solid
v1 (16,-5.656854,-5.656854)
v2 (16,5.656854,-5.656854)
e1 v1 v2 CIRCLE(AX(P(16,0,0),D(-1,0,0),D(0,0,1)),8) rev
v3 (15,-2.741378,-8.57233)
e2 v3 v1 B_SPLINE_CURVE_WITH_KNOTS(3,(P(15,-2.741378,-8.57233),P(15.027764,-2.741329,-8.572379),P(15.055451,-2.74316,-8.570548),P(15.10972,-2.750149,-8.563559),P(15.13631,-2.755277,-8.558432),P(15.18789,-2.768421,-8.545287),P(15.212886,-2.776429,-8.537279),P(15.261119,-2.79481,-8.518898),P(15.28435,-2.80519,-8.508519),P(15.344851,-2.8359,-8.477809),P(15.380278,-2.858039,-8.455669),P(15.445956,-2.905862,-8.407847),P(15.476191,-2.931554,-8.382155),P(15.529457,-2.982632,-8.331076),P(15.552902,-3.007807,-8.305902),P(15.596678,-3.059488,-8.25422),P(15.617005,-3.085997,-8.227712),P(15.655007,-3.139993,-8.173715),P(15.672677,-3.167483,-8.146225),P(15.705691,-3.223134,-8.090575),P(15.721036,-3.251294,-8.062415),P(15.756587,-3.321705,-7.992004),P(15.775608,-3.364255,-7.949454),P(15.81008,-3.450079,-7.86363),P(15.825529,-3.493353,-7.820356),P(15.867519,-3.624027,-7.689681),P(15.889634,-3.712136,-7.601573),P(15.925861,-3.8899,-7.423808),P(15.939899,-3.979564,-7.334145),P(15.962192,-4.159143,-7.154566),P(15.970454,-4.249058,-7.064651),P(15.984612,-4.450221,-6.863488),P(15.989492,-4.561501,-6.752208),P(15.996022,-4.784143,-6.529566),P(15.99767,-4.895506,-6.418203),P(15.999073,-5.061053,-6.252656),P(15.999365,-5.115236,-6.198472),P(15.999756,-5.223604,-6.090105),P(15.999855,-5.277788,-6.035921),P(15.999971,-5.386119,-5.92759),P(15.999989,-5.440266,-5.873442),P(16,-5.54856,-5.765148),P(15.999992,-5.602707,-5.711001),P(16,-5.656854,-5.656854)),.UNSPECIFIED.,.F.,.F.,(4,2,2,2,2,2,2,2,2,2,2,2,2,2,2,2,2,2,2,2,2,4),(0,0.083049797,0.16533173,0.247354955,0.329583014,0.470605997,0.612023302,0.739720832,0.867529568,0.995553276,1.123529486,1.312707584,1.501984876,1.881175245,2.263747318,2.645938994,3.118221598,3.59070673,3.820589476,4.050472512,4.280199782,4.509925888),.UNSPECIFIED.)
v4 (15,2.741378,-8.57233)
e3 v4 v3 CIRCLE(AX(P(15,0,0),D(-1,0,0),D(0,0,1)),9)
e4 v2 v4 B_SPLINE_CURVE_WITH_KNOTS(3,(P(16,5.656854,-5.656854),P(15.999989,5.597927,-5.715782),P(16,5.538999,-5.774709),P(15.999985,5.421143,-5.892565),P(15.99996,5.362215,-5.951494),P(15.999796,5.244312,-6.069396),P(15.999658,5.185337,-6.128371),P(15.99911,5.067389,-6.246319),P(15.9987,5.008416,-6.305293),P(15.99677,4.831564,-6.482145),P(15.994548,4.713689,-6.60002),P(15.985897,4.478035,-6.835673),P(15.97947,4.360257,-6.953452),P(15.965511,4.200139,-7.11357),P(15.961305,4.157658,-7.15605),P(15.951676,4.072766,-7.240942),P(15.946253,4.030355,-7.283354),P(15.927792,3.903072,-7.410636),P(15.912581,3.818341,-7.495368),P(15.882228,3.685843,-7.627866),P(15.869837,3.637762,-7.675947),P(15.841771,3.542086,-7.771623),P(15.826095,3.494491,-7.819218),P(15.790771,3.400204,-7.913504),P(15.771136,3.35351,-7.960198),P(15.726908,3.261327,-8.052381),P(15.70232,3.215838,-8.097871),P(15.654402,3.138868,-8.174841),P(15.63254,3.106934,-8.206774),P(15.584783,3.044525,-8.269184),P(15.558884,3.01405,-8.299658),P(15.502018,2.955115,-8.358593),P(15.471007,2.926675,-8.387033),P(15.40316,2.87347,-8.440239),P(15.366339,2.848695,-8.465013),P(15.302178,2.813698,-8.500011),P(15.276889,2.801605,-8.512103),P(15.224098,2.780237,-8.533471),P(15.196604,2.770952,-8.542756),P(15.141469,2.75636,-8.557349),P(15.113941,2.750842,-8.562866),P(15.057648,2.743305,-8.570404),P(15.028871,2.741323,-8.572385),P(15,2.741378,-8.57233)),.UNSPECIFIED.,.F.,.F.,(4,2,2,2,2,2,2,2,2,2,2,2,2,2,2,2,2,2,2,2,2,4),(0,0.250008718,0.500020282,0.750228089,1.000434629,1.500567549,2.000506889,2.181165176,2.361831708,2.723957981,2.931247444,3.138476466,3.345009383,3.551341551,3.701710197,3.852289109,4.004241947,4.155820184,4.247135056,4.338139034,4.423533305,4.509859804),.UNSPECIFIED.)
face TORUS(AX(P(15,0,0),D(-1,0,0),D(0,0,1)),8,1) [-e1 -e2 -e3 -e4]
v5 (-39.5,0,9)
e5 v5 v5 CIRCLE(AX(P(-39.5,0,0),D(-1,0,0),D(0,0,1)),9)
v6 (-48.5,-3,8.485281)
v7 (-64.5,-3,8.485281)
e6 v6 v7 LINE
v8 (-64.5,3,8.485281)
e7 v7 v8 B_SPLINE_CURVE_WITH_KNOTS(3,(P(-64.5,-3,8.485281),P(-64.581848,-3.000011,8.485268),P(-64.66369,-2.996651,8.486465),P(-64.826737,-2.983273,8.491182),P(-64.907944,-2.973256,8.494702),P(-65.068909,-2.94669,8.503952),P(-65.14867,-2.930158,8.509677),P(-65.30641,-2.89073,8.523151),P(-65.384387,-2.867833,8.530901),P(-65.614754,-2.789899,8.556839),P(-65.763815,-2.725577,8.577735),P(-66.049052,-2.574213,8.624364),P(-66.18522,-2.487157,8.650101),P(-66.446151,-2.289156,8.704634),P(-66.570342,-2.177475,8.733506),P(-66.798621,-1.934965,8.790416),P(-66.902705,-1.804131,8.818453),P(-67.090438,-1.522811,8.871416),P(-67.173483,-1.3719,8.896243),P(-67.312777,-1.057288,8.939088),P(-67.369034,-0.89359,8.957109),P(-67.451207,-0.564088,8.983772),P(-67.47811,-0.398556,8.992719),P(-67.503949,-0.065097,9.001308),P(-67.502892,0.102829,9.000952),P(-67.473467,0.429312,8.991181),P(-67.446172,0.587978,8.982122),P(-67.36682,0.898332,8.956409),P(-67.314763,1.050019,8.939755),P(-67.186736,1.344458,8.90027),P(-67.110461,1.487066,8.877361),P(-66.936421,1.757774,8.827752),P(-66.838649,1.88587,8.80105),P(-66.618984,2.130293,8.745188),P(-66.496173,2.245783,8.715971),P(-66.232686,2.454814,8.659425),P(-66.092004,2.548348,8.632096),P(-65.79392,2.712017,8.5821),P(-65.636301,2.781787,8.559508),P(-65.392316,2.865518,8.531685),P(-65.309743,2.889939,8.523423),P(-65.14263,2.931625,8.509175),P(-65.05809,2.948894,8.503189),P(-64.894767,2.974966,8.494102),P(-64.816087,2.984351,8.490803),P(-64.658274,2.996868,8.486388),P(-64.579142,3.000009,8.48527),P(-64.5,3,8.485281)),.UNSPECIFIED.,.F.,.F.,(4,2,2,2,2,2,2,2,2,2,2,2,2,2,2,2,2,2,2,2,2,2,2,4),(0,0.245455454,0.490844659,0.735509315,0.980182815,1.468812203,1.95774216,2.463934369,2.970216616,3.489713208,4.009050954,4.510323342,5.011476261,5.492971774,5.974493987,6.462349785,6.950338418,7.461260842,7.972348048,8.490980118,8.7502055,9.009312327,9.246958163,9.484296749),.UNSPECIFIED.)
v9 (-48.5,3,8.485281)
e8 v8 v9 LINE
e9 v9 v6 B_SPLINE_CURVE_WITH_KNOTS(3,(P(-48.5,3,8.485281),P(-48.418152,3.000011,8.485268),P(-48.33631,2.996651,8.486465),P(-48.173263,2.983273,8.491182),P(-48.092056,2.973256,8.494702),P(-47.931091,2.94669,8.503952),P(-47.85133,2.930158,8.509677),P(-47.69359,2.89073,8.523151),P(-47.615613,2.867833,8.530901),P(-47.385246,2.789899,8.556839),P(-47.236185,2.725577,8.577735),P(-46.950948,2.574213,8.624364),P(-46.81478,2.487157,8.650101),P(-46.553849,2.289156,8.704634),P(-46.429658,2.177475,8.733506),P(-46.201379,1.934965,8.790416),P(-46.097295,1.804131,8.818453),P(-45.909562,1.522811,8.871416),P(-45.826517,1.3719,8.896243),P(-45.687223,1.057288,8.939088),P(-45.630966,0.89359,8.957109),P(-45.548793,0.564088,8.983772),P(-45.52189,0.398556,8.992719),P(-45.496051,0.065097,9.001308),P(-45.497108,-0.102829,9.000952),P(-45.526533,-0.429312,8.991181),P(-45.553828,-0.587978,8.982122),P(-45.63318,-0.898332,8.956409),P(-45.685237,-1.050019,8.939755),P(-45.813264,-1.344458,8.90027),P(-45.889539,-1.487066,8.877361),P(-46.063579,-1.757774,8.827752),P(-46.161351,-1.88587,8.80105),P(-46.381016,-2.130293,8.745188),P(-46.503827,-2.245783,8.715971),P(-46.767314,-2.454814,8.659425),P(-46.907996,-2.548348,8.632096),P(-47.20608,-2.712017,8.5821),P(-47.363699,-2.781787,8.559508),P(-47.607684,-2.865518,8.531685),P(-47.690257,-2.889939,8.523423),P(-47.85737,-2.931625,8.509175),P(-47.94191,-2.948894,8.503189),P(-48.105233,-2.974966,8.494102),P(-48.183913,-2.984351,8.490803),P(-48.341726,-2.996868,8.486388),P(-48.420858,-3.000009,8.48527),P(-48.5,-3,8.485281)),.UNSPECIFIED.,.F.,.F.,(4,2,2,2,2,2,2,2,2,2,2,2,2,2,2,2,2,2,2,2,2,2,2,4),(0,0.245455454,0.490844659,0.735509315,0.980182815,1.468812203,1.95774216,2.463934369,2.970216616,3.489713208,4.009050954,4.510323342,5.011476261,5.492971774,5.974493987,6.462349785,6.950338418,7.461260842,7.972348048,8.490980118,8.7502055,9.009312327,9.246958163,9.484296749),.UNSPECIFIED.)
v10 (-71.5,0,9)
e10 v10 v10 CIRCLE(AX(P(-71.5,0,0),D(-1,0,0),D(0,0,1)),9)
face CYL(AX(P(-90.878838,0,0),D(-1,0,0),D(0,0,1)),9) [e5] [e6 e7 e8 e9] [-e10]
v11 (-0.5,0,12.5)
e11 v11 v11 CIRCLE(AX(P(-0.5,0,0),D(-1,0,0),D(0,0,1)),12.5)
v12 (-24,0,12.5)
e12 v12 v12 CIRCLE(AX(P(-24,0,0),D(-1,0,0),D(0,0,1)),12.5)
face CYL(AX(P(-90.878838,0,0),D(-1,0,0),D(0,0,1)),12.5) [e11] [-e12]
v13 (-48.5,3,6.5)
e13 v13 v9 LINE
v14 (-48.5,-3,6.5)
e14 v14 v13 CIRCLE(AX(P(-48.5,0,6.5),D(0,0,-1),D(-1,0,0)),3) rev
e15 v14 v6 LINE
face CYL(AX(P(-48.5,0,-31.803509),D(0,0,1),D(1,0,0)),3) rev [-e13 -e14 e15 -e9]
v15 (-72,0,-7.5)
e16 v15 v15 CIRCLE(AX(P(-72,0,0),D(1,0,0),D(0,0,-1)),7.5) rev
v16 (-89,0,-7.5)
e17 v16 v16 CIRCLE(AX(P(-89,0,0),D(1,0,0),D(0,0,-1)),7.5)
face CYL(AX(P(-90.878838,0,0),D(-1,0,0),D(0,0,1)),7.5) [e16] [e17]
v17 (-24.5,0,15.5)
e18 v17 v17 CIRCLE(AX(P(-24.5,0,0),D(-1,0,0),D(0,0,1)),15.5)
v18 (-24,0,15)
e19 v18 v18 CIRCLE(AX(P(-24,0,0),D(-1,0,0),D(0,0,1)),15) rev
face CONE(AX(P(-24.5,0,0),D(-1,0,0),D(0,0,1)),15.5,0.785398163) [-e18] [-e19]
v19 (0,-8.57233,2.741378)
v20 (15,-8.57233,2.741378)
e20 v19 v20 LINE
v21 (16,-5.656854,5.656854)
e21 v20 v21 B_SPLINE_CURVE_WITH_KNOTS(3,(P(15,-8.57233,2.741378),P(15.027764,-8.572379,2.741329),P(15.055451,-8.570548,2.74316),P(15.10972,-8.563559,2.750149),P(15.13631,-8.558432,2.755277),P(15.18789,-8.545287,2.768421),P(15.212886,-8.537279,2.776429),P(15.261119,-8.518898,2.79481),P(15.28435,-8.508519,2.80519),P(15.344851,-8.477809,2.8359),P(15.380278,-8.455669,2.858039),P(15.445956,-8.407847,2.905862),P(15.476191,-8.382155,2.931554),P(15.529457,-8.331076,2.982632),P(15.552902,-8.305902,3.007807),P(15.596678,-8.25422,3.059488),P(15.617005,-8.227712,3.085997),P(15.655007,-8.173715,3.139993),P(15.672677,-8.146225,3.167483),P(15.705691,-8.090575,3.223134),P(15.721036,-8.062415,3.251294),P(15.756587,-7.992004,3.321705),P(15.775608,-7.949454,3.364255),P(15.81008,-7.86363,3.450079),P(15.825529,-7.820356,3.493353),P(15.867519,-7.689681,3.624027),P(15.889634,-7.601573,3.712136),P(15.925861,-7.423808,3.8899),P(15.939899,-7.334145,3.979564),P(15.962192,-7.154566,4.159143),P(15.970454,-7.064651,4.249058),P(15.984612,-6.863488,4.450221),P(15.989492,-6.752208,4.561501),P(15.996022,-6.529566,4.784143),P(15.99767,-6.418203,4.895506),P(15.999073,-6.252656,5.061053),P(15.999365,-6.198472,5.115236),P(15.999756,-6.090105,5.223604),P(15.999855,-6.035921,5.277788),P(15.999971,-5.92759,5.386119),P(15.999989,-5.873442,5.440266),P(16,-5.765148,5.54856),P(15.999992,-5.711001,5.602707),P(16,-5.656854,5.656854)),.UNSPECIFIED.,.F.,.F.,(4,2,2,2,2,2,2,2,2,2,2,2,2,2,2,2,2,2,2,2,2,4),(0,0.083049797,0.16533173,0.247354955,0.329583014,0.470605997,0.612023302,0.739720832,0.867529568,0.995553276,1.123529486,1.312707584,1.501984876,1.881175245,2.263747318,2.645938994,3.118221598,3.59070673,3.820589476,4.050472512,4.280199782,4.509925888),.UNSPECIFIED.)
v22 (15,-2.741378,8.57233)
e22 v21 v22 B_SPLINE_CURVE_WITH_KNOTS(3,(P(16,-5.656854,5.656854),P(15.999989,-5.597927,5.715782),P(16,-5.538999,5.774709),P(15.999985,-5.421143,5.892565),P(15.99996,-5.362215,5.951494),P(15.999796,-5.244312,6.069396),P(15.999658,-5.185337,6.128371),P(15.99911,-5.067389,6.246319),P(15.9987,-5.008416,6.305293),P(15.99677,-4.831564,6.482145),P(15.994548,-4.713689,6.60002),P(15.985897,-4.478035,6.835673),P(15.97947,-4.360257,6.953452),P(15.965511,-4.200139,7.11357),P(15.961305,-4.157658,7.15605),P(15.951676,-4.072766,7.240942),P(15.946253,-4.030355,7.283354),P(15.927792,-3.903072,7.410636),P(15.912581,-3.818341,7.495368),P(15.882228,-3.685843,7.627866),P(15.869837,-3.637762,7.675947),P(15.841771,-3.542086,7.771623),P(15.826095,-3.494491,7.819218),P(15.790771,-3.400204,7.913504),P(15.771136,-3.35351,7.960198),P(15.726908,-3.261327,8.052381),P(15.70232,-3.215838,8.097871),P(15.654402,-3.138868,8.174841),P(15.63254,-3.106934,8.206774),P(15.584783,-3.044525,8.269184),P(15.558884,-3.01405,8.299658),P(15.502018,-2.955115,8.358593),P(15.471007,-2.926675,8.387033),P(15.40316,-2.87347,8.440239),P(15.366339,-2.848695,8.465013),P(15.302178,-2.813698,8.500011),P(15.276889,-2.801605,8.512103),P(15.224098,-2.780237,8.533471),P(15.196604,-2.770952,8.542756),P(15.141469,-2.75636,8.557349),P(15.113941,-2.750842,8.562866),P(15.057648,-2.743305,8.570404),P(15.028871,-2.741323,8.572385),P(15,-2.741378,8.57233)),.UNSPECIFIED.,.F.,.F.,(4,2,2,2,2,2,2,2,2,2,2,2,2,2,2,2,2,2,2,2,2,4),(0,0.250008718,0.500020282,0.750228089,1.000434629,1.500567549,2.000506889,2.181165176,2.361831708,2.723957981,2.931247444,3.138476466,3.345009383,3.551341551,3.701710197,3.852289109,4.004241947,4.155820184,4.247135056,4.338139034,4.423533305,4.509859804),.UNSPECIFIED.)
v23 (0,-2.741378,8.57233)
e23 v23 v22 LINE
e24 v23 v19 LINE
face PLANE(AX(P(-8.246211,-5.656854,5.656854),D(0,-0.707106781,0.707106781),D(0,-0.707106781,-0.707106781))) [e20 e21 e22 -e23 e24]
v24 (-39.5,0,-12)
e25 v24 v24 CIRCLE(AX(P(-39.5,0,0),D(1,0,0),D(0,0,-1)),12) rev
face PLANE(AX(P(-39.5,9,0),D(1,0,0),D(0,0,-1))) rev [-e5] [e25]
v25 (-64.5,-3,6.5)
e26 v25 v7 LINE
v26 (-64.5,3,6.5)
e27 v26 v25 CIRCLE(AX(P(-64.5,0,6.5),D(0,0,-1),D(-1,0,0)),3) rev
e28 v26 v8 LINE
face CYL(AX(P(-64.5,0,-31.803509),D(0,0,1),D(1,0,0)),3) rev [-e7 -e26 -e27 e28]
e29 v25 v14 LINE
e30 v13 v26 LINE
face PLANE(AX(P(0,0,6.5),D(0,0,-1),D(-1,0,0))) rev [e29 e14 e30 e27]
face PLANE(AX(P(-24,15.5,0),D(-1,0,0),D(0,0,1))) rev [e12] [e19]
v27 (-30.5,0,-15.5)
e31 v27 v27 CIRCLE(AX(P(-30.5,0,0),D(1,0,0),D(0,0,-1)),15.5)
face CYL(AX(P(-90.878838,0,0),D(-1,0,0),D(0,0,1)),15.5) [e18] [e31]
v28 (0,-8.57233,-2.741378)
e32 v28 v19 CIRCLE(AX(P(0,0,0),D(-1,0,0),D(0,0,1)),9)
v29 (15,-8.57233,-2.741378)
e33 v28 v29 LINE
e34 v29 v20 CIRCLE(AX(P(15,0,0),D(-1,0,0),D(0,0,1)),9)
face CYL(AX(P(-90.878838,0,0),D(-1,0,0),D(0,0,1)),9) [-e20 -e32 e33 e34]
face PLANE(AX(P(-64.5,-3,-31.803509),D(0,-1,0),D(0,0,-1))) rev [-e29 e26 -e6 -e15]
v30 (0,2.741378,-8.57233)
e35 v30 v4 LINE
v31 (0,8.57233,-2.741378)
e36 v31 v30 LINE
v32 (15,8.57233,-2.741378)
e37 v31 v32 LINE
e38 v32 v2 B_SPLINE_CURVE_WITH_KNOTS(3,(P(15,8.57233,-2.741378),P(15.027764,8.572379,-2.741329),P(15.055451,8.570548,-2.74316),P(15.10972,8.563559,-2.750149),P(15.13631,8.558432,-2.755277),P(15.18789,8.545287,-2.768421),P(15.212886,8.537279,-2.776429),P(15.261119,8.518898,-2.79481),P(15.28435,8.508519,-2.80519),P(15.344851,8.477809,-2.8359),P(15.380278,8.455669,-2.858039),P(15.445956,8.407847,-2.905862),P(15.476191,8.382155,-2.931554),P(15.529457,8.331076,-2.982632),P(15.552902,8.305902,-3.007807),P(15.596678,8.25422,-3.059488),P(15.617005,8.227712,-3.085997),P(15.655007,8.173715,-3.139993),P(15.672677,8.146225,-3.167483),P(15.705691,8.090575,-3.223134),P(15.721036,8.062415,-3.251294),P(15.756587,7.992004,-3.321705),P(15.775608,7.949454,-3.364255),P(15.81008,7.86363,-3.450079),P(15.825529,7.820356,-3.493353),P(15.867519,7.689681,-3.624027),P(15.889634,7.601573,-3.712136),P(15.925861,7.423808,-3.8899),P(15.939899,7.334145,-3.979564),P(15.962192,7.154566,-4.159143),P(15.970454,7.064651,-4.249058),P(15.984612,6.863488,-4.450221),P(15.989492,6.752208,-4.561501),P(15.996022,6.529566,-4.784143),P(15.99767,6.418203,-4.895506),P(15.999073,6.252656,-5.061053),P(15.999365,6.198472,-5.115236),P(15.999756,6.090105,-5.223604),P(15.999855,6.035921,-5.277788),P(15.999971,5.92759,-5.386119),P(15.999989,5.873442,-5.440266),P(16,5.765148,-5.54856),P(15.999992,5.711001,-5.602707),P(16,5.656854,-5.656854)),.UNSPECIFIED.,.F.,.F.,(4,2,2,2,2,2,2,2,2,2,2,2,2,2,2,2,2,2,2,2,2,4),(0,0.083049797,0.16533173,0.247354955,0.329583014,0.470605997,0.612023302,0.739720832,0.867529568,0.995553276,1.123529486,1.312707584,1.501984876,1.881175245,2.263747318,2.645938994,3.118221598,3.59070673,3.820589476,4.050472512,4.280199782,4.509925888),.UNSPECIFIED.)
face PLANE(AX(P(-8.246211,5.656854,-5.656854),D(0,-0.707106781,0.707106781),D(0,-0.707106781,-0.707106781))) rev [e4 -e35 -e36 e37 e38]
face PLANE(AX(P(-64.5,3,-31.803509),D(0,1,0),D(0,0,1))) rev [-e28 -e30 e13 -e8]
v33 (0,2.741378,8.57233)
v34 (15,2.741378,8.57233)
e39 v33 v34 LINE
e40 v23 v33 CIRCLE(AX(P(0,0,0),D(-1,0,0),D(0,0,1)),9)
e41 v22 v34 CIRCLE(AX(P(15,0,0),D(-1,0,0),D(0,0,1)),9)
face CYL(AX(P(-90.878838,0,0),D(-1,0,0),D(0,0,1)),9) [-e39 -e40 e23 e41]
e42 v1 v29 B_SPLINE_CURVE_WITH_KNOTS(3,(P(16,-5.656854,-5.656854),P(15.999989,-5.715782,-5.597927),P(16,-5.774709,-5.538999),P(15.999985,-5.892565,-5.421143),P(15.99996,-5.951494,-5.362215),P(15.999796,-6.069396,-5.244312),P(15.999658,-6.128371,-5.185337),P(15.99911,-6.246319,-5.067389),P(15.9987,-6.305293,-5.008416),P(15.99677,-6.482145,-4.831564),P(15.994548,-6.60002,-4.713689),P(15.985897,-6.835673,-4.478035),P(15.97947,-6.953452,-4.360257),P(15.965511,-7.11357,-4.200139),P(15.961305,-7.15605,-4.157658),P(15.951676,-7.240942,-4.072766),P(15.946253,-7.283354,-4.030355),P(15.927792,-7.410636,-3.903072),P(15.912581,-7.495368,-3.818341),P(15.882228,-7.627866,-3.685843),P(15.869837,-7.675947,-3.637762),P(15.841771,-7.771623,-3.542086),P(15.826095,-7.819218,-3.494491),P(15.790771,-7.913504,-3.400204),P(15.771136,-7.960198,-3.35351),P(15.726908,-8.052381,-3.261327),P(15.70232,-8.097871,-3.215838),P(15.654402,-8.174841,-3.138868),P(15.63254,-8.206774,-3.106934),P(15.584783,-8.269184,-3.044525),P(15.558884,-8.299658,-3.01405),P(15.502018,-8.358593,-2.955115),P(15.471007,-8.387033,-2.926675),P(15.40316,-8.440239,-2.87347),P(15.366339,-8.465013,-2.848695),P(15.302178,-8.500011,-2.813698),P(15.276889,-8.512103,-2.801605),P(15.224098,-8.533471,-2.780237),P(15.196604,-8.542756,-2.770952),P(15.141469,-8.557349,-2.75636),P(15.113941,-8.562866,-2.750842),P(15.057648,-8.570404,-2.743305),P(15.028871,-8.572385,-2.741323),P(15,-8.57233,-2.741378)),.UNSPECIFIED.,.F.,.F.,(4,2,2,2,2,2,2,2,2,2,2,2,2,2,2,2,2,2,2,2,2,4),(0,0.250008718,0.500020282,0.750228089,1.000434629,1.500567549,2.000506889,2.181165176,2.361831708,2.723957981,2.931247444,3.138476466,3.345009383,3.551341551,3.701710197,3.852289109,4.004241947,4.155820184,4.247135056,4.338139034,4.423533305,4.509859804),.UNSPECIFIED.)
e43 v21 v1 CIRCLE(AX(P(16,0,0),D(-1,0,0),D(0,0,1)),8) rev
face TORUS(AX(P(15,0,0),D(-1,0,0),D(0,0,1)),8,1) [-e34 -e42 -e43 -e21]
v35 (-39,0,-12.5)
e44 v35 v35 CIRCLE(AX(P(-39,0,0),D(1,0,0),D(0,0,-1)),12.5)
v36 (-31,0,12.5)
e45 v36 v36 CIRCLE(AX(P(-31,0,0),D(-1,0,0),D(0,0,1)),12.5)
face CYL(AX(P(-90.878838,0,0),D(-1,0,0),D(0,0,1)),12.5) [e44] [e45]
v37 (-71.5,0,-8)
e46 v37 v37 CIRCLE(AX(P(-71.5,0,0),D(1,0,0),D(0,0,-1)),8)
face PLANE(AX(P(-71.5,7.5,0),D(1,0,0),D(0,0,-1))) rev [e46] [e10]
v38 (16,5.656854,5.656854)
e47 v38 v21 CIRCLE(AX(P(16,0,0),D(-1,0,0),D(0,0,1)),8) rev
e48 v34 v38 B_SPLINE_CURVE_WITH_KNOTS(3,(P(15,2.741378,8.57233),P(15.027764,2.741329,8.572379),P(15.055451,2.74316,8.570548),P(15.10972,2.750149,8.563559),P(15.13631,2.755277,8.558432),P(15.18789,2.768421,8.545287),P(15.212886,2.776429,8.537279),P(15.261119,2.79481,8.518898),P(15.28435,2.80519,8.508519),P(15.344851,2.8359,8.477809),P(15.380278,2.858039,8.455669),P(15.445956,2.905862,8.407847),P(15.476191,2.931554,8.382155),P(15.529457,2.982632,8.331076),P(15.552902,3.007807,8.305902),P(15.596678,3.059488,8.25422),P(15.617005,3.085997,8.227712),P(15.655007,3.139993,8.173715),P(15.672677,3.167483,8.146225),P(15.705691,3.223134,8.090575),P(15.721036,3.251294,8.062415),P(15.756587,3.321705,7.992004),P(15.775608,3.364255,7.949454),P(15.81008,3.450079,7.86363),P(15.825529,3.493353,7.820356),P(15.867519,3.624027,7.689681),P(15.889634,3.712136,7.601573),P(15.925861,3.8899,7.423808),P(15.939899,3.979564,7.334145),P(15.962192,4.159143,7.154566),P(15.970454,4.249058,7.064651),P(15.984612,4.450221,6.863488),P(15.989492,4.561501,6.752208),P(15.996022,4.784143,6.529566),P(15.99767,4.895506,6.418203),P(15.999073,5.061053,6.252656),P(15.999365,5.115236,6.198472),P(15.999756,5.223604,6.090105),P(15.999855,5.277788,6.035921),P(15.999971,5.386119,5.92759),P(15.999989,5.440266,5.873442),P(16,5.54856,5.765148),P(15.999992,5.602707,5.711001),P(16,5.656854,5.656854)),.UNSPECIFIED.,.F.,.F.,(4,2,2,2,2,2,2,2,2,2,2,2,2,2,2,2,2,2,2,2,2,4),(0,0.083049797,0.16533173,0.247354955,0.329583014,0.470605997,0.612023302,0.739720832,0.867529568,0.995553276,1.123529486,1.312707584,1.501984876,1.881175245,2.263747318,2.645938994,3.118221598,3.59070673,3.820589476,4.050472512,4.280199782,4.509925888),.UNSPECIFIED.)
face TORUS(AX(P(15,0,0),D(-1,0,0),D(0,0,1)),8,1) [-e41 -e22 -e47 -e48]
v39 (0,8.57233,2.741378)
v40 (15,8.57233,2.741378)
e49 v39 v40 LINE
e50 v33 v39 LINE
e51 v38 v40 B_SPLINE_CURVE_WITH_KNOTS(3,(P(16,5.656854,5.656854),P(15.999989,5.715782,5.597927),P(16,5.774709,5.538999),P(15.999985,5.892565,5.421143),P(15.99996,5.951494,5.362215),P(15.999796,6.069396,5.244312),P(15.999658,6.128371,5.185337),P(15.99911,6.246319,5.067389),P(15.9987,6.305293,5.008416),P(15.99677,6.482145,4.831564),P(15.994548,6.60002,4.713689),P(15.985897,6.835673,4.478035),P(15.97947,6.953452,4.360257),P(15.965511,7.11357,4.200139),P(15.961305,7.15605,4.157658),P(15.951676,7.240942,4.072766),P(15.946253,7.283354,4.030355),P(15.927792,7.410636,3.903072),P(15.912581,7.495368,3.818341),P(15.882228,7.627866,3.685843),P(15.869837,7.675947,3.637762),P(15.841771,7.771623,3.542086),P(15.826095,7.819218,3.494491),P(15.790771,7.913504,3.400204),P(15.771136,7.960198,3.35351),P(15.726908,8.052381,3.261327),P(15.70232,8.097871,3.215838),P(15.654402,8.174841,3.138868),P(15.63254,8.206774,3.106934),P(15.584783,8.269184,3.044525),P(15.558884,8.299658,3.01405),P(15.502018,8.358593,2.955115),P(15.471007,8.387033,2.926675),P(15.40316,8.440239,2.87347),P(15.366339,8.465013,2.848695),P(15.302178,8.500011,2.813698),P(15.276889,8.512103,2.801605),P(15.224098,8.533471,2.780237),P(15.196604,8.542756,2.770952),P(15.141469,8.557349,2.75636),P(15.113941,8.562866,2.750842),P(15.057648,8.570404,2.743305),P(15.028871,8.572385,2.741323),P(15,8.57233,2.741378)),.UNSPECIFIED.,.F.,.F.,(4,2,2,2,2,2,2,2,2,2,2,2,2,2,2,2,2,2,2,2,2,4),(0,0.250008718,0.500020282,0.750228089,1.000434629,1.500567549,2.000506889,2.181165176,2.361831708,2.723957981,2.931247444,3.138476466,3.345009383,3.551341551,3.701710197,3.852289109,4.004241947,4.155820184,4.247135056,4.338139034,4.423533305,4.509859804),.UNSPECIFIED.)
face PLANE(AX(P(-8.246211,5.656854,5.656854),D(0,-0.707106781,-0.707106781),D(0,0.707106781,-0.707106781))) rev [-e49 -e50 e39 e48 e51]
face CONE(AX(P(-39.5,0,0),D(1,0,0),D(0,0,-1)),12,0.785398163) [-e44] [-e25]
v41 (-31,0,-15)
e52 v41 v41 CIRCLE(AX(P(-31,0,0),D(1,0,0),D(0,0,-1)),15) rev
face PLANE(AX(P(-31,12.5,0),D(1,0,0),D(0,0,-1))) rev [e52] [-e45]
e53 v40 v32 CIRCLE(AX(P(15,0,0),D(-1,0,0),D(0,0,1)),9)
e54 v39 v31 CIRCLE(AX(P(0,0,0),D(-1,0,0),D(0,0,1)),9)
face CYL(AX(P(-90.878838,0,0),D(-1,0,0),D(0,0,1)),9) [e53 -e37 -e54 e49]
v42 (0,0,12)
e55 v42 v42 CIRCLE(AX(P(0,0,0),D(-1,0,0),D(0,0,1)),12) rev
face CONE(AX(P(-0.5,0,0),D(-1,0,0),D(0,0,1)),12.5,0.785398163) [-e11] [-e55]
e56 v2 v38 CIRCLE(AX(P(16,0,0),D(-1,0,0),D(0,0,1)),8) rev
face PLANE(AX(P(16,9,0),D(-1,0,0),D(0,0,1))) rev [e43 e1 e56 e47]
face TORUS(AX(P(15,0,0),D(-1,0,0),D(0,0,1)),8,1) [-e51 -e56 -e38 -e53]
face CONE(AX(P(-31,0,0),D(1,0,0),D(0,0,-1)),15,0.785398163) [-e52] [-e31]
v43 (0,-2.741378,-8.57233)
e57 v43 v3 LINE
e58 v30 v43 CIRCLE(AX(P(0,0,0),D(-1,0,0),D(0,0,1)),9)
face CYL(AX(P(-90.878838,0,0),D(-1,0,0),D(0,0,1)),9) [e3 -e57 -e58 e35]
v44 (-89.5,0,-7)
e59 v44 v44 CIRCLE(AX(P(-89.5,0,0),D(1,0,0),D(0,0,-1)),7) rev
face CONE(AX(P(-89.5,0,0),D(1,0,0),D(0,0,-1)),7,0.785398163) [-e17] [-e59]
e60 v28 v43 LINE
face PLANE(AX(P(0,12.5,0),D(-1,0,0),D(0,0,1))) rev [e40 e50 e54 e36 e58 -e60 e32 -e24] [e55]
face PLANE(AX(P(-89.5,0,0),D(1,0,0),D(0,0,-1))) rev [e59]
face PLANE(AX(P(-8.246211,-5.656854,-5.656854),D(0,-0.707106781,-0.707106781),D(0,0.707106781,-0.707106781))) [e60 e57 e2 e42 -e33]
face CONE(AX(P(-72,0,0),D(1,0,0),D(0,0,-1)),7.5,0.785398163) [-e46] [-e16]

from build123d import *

# Parameters (mm, degrees)
CUT_EXTRUDE_1_DEPTH = 16
CUT_EXTRUDE_2_DEPTH = 2.5
FILLET_1_R          = 1
CHAMFER_1_SIZE      = 0.5


with BuildPart() as part:
    # 草图2 → 旋转1 (revolve)
    with BuildSketch(Plane.XY, mode=Mode.PRIVATE) as revolve_1_sk:
        Polygon((-89.5, 0), (-89.5, 7.5), (-71.5, 7.5), (-71.5, 9), (-39.5, 9), (-39.5, 12.5), (-31, 12.5), (-31, 15.5), (-24, 15.5), (-24, 12.5), (0, 12.5), (0, 9), (16, 9), (16, 0), align=None)
    revolve(revolve_1_sk.sketch.rotate(Axis((-90.878838174, 0, 0), (1, 0, 0)), 90), axis=Axis((-90.878838174, 0, 0), (1, 0, 0)))

    # 草图3 → 切除-拉伸1 (cut)
    with BuildSketch(Plane(origin=(16, 0, 0), x_dir=(0, 0, -1), z_dir=(1, 0, 0))):
        with BuildLine():
            ThreePointArc((-2.741378302, 8.572330197), (-6.363961031, 6.363961031), (-8.572330197, 2.741378302))
            Line((-8.572330197, 2.741378302), (-2.741378302, 8.572330197))
        make_face()
        with BuildLine():
            Line((-2.741378302, -8.572330197), (-8.572330197, -2.741378302))
            ThreePointArc((-8.572330197, -2.741378302), (-6.363961031, -6.363961031), (-2.741378302, -8.572330197))
        make_face()
        with BuildLine():
            Line((8.572330197, -2.741378302), (2.741378302, -8.572330197))
            ThreePointArc((2.741378302, -8.572330197), (6.363961031, -6.363961031), (8.572330197, -2.741378302))
        make_face()
        with BuildLine():
            ThreePointArc((8.572330197, 2.741378302), (6.363961031, 6.363961031), (2.741378302, 8.572330197))
            Line((2.741378302, 8.572330197), (8.572330197, 2.741378302))
        make_face()
    extrude(amount=-CUT_EXTRUDE_1_DEPTH, mode=Mode.SUBTRACT)

    # 草图5 → 切除-拉伸2 (cut)
    with BuildSketch(Plane.XY.offset(9)):
        with BuildLine():
            Line((-64.5, 3), (-48.5, 3))
            ThreePointArc((-48.5, 3), (-45.5, 0), (-48.5, -3))
            Line((-48.5, -3), (-64.5, -3))
            ThreePointArc((-64.5, -3), (-67.5, 0), (-64.5, 3))
        make_face()
    extrude(amount=-CUT_EXTRUDE_2_DEPTH, mode=Mode.SUBTRACT)

    # 圆角1
    fillet_1_edges = [part.edges().sort_by_distance(p)[0] for p in [
        (16, -9, 0),
        (16, 0, -9),
        (16, 9, 0),
        (16, 0, 9),
    ]]
    fillet(fillet_1_edges, radius=FILLET_1_R - 0.0001)  # a hair under: the kernel refuses the full size

    # 倒角1
    chamfer_1_edges = [part.edges().sort_by_distance(p)[0] for p in [
        (0, 0, -12.5),
        (-24, 0, -15.5),
        (-31, 0, -15.5),
        (-39.5, 0, -12.5),
        (-71.5, 0, -7.5),
        (-89.5, 0, -7.5),
    ]]
    chamfer(chamfer_1_edges, length=CHAMFER_1_SIZE)


solid = part.part
